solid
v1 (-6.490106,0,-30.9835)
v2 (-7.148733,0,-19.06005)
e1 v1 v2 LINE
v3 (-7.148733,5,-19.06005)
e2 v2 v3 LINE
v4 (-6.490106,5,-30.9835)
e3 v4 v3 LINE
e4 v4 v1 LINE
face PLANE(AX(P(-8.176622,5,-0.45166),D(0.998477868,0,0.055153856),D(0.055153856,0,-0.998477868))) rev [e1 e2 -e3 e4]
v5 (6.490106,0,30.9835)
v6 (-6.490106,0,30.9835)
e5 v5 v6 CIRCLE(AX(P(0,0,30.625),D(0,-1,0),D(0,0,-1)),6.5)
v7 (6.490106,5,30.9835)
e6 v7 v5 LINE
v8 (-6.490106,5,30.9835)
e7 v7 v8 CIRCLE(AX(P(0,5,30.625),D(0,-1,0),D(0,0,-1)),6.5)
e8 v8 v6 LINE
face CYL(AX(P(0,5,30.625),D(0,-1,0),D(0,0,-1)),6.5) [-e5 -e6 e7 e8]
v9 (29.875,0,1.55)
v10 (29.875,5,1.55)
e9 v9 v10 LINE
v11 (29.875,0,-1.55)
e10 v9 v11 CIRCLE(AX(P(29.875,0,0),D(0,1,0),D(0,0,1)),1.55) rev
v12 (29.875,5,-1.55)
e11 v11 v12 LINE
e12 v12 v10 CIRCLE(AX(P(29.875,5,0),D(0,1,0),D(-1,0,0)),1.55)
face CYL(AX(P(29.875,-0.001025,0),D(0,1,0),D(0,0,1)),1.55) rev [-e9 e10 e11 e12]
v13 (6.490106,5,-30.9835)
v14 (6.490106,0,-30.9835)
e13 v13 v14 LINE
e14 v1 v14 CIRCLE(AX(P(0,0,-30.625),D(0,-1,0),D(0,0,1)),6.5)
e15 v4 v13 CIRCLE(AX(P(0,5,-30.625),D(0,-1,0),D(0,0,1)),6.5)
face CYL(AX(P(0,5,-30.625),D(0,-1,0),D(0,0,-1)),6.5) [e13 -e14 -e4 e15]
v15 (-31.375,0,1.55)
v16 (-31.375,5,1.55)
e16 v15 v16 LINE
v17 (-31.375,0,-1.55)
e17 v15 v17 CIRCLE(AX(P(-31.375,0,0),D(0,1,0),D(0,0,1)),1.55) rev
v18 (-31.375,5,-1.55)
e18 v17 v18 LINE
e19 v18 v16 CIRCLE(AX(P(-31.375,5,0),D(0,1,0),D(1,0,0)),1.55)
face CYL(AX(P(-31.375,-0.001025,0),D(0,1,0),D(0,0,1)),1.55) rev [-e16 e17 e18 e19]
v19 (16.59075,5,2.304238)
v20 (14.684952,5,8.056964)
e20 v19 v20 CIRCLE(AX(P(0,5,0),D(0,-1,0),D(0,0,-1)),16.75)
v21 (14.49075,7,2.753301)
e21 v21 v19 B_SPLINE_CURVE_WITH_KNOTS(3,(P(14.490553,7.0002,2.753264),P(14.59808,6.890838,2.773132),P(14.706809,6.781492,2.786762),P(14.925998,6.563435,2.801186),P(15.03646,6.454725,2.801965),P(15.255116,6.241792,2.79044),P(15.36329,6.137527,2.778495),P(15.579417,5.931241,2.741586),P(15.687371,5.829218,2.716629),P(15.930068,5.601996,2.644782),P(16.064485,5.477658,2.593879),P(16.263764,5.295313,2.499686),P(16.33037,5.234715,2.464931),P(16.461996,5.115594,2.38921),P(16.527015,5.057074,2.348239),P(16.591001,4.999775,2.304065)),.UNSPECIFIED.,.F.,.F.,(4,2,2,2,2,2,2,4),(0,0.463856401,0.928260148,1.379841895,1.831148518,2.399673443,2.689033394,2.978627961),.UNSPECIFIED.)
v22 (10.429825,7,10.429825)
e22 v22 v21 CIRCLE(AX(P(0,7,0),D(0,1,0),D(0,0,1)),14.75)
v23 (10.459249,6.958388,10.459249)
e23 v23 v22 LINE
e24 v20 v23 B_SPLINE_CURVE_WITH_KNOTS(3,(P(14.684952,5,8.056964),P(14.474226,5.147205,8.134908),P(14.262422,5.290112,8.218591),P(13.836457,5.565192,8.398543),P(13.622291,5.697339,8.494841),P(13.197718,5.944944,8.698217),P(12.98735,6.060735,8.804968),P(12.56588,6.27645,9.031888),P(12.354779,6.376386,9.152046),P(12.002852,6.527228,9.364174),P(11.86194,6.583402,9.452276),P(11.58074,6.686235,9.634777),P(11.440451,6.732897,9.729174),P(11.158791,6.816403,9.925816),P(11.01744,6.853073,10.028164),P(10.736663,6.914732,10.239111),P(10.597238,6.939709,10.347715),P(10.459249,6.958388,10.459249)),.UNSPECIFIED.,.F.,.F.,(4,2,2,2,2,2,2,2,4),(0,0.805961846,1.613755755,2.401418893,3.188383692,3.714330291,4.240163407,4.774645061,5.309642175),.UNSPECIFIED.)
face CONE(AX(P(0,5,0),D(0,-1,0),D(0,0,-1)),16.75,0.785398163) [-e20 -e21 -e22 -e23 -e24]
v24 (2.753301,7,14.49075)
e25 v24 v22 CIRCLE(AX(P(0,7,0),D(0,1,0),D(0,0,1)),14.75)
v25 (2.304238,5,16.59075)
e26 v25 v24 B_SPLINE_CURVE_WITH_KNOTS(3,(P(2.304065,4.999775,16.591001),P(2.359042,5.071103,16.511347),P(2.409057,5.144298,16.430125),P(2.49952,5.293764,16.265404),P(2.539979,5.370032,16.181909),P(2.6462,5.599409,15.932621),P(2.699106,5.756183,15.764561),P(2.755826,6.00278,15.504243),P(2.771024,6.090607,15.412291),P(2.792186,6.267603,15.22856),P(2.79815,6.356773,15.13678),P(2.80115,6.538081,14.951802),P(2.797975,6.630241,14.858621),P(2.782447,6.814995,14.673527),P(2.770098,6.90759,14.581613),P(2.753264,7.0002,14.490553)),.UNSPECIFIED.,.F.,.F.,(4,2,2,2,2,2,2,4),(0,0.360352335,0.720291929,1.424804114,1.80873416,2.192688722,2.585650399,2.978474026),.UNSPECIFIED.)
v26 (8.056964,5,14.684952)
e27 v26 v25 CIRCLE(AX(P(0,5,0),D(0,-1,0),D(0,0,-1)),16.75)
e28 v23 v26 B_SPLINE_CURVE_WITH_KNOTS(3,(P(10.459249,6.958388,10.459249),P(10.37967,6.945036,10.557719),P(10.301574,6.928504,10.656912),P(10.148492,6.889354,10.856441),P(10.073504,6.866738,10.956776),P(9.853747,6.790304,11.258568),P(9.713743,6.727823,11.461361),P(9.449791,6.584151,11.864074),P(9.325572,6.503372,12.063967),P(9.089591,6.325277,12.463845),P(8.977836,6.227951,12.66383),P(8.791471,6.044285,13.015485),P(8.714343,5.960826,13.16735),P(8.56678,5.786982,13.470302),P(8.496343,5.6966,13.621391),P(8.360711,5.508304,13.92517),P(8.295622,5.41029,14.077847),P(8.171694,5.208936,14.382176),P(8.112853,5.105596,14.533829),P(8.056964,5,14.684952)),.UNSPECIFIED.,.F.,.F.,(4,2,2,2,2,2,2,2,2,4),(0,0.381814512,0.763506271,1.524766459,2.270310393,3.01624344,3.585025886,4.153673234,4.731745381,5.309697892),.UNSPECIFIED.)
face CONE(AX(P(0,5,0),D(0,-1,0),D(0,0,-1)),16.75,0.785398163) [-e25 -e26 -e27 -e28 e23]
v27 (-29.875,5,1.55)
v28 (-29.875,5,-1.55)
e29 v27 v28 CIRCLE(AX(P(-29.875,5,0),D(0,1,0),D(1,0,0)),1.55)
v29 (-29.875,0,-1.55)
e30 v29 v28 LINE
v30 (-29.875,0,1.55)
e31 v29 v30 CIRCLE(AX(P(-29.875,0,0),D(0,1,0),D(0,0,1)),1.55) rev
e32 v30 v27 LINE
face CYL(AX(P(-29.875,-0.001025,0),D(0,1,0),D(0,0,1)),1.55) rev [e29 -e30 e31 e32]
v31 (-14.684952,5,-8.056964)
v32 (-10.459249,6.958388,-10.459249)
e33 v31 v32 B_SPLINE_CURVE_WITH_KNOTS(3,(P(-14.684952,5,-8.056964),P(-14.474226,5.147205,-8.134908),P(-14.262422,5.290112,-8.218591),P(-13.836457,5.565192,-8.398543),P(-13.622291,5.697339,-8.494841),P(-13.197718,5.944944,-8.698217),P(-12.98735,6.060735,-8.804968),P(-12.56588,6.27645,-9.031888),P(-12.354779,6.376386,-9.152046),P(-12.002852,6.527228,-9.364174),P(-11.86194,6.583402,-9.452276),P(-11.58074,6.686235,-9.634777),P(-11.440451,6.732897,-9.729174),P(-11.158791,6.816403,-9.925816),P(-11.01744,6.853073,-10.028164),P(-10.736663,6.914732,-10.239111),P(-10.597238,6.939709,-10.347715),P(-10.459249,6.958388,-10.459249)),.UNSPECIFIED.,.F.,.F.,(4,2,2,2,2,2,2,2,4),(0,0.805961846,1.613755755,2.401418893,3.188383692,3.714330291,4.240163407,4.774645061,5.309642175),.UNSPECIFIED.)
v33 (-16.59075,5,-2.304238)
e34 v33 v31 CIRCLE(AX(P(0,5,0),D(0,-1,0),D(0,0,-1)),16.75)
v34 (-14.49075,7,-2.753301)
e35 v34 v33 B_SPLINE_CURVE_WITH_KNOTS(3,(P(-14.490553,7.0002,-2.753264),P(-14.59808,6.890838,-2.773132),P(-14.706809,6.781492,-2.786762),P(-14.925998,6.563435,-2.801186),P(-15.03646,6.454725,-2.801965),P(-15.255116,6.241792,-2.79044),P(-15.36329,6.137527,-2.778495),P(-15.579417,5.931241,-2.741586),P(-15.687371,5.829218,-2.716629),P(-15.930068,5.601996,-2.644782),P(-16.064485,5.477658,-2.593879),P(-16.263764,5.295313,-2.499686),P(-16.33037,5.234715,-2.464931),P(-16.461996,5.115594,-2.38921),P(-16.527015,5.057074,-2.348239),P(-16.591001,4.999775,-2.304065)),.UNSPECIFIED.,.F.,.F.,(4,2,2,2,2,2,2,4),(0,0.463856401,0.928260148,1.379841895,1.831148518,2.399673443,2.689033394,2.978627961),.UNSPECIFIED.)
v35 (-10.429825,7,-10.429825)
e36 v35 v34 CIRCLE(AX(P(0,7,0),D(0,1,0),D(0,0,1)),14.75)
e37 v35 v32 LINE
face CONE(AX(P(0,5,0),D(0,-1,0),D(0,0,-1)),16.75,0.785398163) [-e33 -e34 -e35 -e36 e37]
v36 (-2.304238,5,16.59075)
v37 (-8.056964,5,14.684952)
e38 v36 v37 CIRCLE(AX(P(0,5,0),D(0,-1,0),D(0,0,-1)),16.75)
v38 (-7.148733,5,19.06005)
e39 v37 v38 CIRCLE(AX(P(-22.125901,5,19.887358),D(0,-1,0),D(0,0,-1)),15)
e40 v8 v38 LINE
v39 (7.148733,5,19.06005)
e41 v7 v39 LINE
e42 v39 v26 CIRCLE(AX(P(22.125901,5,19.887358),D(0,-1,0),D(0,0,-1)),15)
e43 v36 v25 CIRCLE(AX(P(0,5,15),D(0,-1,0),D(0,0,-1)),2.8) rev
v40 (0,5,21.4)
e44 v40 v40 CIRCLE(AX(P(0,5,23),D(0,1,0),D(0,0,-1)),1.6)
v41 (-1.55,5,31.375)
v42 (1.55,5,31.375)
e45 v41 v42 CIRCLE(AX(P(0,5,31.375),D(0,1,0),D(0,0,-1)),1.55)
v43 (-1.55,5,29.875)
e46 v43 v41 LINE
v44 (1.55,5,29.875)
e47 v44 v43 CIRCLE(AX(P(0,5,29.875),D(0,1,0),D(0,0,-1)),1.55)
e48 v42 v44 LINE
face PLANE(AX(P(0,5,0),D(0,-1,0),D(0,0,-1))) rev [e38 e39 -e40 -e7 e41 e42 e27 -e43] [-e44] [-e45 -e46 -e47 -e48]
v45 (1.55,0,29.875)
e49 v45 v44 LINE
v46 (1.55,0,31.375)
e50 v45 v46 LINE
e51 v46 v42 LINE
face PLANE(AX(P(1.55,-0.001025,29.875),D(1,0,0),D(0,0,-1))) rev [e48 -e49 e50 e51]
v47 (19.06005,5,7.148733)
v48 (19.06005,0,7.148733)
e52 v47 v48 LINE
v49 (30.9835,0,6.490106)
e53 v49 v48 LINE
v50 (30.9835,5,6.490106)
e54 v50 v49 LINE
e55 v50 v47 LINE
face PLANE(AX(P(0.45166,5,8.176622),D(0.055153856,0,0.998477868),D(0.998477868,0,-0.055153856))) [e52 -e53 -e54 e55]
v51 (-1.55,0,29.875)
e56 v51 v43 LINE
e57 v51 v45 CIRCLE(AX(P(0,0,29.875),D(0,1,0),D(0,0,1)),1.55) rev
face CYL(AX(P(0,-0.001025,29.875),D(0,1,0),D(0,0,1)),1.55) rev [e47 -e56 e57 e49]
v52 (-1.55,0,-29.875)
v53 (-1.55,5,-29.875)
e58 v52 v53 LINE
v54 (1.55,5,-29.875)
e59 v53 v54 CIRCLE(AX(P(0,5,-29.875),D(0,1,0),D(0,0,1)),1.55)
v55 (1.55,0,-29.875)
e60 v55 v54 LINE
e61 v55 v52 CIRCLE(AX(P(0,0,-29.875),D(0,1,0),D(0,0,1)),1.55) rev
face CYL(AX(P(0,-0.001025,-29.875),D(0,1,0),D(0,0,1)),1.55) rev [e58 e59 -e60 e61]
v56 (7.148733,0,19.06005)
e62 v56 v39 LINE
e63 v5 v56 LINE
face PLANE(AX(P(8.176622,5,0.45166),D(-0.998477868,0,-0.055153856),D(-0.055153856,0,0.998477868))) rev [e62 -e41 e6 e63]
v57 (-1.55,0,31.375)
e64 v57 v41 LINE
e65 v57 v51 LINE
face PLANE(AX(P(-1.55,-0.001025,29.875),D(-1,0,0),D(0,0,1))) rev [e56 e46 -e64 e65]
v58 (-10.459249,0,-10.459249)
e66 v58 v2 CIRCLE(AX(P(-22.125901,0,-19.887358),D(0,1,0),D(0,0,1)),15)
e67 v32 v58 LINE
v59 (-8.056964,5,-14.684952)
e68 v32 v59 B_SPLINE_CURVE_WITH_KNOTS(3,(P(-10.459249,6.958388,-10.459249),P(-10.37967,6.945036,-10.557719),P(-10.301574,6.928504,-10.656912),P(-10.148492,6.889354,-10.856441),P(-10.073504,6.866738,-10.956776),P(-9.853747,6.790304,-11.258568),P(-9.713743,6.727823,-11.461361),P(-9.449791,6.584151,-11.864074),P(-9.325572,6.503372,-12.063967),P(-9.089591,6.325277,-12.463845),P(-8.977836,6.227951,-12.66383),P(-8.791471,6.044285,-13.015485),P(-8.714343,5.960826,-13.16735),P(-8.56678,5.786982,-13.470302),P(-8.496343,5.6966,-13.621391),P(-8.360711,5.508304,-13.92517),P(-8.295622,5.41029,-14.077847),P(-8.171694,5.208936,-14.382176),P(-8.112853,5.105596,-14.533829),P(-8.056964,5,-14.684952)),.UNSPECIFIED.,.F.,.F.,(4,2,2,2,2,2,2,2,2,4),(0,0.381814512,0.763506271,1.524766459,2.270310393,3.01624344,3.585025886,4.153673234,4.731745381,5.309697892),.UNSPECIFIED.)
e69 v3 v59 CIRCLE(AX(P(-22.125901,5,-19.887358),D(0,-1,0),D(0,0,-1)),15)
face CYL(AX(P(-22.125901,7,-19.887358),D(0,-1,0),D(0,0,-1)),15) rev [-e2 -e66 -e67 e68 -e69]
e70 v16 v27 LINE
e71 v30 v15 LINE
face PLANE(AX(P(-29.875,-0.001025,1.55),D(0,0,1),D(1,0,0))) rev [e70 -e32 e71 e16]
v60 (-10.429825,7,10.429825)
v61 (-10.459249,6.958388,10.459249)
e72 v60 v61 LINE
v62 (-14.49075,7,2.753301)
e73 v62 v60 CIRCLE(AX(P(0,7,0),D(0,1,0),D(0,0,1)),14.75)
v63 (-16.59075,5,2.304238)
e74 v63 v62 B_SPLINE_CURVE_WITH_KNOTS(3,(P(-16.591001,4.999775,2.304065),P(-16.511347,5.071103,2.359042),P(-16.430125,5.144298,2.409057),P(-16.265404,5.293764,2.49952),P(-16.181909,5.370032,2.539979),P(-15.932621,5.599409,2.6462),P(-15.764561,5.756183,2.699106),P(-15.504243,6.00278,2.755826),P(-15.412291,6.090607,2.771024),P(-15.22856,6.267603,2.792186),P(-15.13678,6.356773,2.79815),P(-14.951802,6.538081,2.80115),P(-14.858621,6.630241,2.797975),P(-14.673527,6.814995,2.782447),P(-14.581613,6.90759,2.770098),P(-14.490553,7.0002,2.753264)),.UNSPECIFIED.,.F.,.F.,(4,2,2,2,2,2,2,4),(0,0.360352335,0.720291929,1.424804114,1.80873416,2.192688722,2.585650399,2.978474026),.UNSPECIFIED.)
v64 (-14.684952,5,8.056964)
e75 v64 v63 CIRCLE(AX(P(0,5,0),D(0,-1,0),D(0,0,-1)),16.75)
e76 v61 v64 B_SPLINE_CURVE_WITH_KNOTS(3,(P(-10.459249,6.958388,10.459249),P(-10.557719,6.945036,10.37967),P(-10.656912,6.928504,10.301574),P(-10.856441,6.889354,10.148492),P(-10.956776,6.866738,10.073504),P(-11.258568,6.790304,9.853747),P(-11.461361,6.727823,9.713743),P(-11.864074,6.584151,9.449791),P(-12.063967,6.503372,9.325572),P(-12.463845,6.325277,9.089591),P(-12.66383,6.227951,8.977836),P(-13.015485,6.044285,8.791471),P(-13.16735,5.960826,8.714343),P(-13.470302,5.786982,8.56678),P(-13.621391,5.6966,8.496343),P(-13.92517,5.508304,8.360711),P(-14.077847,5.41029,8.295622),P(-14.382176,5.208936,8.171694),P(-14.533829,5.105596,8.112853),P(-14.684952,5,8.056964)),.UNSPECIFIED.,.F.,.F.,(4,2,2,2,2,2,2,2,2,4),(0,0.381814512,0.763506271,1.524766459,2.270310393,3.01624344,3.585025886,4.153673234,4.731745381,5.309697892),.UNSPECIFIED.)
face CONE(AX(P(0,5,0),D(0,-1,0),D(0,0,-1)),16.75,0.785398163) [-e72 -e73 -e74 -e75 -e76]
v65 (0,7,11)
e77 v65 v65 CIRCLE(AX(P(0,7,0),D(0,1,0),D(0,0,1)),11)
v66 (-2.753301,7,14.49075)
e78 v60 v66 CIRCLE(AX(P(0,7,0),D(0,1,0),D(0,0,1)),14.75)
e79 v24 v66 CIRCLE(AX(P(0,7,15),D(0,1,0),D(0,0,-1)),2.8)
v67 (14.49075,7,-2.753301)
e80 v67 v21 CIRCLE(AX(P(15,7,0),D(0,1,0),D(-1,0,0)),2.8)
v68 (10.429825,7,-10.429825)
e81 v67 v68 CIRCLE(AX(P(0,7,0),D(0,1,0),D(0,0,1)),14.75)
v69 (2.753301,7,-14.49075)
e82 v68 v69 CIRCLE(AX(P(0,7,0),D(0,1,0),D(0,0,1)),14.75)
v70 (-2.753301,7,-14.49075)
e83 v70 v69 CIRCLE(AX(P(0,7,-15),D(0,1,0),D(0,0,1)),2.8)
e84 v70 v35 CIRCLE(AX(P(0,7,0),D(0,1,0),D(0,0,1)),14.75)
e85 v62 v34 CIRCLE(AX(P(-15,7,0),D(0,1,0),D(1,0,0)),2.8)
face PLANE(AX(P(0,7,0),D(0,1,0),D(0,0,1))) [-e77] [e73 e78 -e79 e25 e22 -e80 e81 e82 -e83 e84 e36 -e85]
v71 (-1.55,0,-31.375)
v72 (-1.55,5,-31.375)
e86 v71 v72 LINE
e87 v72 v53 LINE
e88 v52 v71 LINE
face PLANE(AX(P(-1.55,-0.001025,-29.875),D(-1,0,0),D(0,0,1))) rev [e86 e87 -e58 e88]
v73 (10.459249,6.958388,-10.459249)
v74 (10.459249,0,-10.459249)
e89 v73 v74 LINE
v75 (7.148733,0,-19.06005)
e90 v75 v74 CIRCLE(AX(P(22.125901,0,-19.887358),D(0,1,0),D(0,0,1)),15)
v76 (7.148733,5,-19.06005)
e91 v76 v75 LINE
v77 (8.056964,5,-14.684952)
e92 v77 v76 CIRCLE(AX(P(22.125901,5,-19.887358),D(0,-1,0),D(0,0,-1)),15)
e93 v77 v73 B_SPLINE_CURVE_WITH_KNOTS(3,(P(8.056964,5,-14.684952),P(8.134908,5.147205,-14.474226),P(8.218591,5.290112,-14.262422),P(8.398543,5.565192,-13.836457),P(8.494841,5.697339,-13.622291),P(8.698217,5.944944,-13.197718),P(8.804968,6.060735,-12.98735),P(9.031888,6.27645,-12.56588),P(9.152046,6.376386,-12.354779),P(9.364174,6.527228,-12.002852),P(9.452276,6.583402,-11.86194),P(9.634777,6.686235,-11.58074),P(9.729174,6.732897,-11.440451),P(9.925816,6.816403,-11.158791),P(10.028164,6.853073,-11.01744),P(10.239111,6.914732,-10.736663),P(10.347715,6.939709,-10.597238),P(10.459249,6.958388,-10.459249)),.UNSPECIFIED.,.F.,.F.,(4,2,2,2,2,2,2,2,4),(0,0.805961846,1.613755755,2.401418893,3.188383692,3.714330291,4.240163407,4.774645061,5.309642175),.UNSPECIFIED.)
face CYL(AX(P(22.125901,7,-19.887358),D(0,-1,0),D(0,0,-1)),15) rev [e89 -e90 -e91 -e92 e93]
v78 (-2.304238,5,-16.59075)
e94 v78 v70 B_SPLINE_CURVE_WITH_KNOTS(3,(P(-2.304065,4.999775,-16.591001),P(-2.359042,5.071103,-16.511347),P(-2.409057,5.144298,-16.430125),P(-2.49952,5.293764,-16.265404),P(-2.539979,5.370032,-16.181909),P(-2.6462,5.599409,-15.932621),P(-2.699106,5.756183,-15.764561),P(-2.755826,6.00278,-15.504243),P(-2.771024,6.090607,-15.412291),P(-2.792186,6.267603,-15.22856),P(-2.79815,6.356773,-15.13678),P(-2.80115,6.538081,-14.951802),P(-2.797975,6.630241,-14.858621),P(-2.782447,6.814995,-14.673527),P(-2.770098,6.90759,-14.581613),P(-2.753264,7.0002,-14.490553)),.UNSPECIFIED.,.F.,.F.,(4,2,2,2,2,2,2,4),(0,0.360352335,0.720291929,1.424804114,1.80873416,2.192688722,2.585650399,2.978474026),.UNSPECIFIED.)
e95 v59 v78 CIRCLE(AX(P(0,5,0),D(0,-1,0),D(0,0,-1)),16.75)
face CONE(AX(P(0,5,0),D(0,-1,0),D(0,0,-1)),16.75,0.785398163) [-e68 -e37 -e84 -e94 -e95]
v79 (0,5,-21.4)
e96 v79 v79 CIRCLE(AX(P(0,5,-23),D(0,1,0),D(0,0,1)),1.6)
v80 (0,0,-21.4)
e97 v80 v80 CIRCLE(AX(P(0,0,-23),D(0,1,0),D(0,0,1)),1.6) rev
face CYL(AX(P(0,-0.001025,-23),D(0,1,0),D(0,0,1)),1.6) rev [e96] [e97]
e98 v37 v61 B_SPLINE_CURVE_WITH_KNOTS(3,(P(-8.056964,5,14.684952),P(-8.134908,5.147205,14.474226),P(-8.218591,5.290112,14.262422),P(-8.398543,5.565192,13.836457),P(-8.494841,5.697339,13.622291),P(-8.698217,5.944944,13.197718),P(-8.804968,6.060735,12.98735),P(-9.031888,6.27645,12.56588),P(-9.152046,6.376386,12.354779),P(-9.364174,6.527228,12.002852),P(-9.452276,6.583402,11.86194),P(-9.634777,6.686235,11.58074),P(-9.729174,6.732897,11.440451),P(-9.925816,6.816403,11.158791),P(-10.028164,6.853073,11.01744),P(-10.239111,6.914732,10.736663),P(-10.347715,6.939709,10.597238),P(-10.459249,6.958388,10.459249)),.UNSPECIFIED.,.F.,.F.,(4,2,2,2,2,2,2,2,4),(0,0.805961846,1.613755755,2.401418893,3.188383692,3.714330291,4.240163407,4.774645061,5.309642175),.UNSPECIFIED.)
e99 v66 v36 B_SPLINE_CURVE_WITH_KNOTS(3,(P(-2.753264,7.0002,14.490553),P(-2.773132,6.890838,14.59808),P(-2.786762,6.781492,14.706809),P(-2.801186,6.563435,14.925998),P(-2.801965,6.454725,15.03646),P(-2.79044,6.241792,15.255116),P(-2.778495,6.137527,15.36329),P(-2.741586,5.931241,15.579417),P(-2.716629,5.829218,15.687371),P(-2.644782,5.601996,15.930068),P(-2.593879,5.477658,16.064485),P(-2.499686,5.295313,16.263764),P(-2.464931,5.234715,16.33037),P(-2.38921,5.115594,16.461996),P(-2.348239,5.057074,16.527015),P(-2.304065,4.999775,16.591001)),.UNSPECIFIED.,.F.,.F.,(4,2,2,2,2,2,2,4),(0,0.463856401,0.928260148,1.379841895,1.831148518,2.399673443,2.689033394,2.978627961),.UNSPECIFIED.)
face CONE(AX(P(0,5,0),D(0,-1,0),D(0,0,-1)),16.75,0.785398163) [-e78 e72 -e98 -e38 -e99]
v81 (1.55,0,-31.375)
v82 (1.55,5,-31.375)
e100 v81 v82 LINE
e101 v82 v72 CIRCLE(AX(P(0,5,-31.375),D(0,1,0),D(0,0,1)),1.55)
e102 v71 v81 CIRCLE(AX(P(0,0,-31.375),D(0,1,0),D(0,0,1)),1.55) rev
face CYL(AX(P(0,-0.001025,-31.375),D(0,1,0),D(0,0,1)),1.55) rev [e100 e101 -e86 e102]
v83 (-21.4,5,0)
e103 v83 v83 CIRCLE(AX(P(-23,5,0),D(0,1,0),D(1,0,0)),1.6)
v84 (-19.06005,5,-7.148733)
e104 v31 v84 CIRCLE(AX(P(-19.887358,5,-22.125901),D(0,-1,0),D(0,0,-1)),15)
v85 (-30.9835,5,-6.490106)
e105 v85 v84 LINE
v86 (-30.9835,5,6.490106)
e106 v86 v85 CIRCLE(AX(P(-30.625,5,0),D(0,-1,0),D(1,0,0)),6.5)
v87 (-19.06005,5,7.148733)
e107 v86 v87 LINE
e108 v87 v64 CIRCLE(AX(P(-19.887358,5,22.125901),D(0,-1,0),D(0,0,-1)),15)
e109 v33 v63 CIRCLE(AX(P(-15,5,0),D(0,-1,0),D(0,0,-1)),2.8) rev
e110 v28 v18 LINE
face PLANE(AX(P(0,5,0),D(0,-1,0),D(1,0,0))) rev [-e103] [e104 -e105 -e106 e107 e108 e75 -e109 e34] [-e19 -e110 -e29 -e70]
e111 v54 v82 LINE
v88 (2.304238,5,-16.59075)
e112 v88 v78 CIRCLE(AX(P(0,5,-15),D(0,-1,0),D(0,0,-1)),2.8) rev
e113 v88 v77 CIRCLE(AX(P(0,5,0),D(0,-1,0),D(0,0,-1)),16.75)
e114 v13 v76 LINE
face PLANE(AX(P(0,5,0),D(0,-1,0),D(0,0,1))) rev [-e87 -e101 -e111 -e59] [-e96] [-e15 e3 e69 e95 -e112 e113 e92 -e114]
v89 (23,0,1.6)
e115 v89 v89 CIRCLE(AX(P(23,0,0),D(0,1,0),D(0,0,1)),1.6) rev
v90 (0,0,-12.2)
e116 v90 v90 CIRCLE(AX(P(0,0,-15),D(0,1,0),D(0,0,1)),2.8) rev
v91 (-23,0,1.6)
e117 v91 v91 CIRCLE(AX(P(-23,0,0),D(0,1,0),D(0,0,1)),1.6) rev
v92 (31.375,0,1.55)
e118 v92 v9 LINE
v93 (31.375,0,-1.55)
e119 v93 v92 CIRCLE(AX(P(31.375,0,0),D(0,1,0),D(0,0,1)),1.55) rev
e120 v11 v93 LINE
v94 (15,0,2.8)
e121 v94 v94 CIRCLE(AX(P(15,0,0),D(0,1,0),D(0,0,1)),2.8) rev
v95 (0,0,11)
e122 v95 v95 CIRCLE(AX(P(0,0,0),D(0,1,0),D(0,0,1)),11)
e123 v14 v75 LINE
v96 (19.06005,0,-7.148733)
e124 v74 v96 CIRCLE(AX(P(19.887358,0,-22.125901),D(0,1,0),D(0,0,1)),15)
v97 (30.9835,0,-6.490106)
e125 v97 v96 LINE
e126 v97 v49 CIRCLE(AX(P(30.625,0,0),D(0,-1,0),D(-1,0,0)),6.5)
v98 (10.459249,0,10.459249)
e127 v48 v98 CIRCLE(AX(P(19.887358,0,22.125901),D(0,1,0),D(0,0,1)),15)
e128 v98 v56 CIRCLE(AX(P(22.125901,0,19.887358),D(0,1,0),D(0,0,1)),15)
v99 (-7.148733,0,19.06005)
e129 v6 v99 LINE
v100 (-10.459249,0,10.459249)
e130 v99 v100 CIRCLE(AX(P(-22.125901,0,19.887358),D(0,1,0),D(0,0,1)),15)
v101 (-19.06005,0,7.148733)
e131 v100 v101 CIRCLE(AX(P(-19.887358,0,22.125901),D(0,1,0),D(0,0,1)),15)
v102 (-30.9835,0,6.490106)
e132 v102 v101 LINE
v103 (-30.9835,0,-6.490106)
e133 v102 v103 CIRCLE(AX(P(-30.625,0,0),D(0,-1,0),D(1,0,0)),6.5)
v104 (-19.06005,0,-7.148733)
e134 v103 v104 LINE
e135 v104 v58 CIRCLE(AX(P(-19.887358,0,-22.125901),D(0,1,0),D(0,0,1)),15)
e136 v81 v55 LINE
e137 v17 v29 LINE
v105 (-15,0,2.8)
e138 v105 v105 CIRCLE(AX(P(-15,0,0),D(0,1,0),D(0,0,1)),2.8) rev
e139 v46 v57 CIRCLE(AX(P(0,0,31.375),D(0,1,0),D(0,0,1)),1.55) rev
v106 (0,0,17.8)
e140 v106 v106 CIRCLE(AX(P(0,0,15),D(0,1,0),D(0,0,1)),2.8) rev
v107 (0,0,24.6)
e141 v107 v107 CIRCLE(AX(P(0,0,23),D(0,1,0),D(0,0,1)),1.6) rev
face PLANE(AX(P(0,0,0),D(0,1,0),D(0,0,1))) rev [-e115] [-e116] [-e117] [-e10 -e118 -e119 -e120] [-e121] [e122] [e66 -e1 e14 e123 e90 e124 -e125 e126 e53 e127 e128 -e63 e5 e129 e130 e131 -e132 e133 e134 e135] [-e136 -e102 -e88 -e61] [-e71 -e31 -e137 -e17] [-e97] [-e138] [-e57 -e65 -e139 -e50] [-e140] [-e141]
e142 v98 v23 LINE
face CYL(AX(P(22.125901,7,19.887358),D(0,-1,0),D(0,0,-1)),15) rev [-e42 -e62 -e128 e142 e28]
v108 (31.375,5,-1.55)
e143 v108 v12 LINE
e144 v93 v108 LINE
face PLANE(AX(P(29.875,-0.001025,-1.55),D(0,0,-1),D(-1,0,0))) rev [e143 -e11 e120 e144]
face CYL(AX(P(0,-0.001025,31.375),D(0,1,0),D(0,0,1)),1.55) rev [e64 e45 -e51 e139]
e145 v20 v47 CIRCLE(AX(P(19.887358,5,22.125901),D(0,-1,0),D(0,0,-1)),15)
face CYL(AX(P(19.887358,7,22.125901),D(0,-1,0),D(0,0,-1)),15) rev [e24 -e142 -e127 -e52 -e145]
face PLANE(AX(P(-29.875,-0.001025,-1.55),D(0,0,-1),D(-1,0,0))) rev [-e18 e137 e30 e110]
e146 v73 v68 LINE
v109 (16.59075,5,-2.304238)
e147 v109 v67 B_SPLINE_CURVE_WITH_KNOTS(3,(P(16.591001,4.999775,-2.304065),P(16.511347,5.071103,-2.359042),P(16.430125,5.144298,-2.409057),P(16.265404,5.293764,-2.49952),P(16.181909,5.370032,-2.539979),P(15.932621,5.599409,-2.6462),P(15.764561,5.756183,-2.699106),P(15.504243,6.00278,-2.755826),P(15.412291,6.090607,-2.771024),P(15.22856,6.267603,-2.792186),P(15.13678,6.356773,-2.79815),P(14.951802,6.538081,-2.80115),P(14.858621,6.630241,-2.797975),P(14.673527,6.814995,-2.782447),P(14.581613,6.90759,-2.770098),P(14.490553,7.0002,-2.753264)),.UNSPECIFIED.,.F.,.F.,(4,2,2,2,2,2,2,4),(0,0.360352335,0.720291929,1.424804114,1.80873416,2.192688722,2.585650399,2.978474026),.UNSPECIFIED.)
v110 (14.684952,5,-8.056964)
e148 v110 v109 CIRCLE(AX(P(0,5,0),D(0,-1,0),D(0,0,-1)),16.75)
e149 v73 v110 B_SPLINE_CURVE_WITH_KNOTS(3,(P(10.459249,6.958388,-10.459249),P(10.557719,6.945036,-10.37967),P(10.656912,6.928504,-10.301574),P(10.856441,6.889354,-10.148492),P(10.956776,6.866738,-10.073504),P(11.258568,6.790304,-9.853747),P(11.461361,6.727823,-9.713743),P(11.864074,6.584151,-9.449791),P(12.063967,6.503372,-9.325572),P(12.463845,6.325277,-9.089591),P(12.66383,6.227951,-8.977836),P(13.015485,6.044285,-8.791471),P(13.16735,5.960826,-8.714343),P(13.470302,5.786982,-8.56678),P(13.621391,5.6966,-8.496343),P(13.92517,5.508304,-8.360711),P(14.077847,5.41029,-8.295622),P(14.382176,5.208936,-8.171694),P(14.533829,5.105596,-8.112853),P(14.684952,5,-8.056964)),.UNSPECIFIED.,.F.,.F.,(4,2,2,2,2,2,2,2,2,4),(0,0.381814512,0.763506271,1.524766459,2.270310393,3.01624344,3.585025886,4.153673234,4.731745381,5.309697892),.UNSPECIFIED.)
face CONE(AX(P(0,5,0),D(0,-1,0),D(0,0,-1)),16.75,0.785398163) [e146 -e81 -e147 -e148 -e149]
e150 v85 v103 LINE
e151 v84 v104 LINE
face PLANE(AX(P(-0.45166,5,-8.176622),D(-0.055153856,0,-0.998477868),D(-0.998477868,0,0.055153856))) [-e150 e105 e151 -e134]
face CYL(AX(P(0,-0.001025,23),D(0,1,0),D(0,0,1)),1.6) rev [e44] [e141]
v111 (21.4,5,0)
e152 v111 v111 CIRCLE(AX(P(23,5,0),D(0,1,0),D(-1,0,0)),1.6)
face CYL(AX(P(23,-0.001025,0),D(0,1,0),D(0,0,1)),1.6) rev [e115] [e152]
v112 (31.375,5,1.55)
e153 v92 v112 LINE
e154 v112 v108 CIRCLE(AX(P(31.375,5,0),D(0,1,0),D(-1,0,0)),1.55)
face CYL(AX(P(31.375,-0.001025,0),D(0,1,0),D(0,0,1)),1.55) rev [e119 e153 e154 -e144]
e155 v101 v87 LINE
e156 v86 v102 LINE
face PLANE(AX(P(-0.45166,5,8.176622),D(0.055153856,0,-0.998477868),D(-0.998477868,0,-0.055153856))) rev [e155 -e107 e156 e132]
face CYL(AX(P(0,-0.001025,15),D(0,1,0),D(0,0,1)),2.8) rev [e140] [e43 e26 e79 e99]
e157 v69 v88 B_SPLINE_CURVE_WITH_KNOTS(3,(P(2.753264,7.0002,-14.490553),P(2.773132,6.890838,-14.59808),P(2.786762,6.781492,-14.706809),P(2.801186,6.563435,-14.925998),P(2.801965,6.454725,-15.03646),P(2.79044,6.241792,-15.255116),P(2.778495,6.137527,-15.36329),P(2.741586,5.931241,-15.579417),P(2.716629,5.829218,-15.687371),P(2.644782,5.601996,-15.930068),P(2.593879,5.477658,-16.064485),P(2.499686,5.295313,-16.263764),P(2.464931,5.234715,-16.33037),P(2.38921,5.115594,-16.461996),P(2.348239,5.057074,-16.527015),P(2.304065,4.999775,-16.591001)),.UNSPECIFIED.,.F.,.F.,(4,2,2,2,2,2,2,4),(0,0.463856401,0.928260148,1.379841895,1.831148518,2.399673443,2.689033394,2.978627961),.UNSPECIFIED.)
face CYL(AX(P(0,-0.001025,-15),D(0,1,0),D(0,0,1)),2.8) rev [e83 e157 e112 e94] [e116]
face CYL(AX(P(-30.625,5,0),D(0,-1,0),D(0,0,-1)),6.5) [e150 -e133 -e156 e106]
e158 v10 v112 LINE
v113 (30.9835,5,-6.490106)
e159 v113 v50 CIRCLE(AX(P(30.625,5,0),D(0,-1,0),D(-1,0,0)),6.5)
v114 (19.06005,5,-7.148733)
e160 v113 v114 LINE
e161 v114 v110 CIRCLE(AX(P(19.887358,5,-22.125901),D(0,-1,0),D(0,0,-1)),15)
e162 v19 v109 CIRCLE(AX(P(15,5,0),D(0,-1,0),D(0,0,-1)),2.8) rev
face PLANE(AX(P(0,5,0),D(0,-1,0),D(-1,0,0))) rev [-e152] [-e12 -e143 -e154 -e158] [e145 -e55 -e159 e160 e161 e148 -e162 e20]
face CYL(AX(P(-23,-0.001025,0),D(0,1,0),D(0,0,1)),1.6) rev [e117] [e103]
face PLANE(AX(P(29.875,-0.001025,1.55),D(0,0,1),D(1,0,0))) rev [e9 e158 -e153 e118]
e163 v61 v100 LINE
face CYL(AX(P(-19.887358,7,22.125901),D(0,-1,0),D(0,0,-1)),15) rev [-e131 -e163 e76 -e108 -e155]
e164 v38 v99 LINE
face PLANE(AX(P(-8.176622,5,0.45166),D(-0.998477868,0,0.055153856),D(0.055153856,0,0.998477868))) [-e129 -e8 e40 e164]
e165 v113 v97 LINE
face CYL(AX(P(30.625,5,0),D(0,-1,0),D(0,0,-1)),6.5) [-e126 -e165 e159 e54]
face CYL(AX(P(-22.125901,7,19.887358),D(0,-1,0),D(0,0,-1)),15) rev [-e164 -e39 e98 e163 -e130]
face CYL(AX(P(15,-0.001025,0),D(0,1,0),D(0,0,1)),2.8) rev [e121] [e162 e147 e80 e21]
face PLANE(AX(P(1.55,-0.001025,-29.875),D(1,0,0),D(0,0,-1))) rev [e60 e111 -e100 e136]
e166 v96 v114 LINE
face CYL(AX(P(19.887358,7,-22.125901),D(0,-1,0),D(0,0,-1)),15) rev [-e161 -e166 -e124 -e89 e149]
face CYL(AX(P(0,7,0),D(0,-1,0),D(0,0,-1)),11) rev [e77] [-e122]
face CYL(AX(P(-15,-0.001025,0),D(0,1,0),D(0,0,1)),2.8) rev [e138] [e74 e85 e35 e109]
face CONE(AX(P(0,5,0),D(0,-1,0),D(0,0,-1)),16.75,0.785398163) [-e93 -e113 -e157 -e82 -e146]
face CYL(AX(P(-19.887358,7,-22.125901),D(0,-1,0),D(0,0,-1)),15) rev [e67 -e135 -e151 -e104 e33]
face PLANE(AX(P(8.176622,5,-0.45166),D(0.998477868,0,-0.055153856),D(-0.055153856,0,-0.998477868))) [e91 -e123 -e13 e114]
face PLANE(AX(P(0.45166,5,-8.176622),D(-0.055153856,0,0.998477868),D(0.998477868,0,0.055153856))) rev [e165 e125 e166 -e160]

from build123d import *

# Parameters (mm, degrees)
SKETCH1_R           = 14.75
SKETCH1_R_2         = 11
BOSS_EXTRUDE1_DEPTH = 7
SKETCH5_R           = 6.5
BOSS_EXTRUDE3_DEPTH = 5
FILLET2_R           = 15
CIRPATTERN2_DEPTH   = 5
CHAMFER2_SIZE       = 2
CUT_EXTRUDE3_REACH  = 54.74
CIRPATTERN4_COUNT   = 4
CUT_EXTRUDE4_REACH  = 54.967
SKETCH9_R           = 2.8
CIRPATTERN5_COUNT   = 4
CUT_EXTRUDE5_REACH  = 54.74
SKETCH10_R          = 1.6
CIRPATTERN6_COUNT   = 4


# Read off the part's stored shape, not the designer's step: CirPattern2
with BuildPart() as part:
    # Sketch1 → Boss-Extrude1 (new body)
    with BuildSketch(Plane(origin=(0, 0, 0), x_dir=(1, 0, 0), z_dir=(0, 1, 0))):
        with Locations(Location((0, 0, 0), (0, 0, 270))):
            Circle(SKETCH1_R)
        with Locations(Location((0, 0, 0), (0, 0, 270))):
            Circle(SKETCH1_R_2, mode=Mode.SUBTRACT)
    extrude(amount=BOSS_EXTRUDE1_DEPTH)

    # Sketch5 → Boss-Extrude3 (add)
    with BuildSketch(Plane.XZ):
        with BuildLine():
            ThreePointArc((6.5, 30.625), (-0.17931828, 24.127473936), (-6.49010614, 30.983500062))
            Line((-6.49010614, 30.983500062), (-7.5, 12.700885796))
            ThreePointArc((-7.5, 12.700885796), (0, 14.75), (7.5, 12.700885796))
            Line((7.5, 12.700885796), (6.49010614, 30.983500062))
            ThreePointArc((6.49010614, 30.983500062), (6.497526064, 30.80431828), (6.5, 30.625))
        make_face()
        with Locations((0, 30.625)):
            Circle(SKETCH5_R)
    extrude(amount=-BOSS_EXTRUDE3_DEPTH)

    # Fillet2
    fillet2_edges = [part.edges().sort_by_distance(p)[0] for p in [
        (7.5, 2.5, 12.700885796),
        (-7.5, 2.5, 12.700885796),
    ]]
    fillet(fillet2_edges, radius=FILLET2_R)

    # CirPattern2 outline → CirPattern2 (add)
    with BuildSketch(Plane(origin=(0, 0, 0), x_dir=(1, 0, 0), z_dir=(0, 1, 0))):
        with BuildLine():
            Line((-30.983500062, -6.49010614), (-19.060050189, -7.14873289))
            ThreePointArc((-19.060050189, -7.14873289), (-14.499104834, -8.127089257), (-10.459249152, -10.459249152))
            ThreePointArc((-10.459249152, -10.459249152), (-10.710685451, -10.156332582), (-10.969984482, -9.860118684))
            ThreePointArc((-10.969984482, -9.860118684), (0, 14.75), (10.969984482, -9.860118684))
            ThreePointArc((10.969984482, -9.860118684), (10.710685451, -10.156332582), (10.459249152, -10.459249152))
            ThreePointArc((10.459249152, -10.459249152), (14.499104834, -8.127089257), (19.060050189, -7.14873289))
            Line((19.060050189, -7.14873289), (30.983500062, -6.49010614))
            ThreePointArc((30.983500062, -6.49010614), (37.125, 0), (30.983500062, 6.49010614))
            Line((30.983500062, 6.49010614), (19.060050189, 7.14873289))
            ThreePointArc((19.060050189, 7.14873289), (14.499104834, 8.127089257), (10.459249152, 10.459249152))
            ThreePointArc((10.459249152, 10.459249152), (8.127089257, 14.499104834), (7.14873289, 19.060050189))
            Line((7.14873289, 19.060050189), (6.49010614, 30.983500062))
            ThreePointArc((6.49010614, 30.983500062), (0, 37.125), (-6.49010614, 30.983500062))
            Line((-6.49010614, 30.983500062), (-7.14873289, 19.060050189))
            ThreePointArc((-7.14873289, 19.060050189), (-8.127089257, 14.499104834), (-10.459249152, 10.459249152))
            ThreePointArc((-10.459249152, 10.459249152), (-14.499104834, 8.127089257), (-19.060050189, 7.14873289))
            Line((-19.060050189, 7.14873289), (-30.983500062, 6.49010614))
            ThreePointArc((-30.983500062, 6.49010614), (-37.125, 0), (-30.983500062, -6.49010614))
        make_face()
    extrude(amount=CIRPATTERN2_DEPTH)

    # Chamfer2
    # the kernel refuses this chamfer: 2 mm, written as the material it adds along each edge
    with BuildSketch(Plane(origin=(0, 5, 0), x_dir=(-0.7437277614936905, 0, 0.6684826226489246), z_dir=(0.6684826226489246, 0, 0.7437277614936905))) as chamfer2_piece_1_section:
        Polygon((14.75, -CHAMFER2_SIZE), (14.75 + CHAMFER2_SIZE, 0), (14.75, 0), align=None)
    chamfer2_piece_1 = revolve(axis=Axis((0, 5, 0), (0, -1, 0)), revolution_arc=263.900121289, mode=Mode.PRIVATE)
    chamfer2_piece_1 = chamfer2_piece_1 - Plane(origin=(-19.887358028, 5.976556714, 22.125900918), x_dir=(0.055153855863411774, 0, -0.998477867648251), z_dir=(0, -1, 0)) * Cylinder(15.000000014, 67, mode=Mode.PRIVATE)
    chamfer2_piece_1 = chamfer2_piece_1 - Plane(origin=(19.887358028, 5.976556714, 22.125900918), x_dir=(-0.62854059114179, 0, -0.7777767837156939), z_dir=(0, -1, 0)) * Cylinder(15.000000014, 67, mode=Mode.PRIVATE)
    chamfer2_piece_1 = chamfer2_piece_1 - Plane(origin=(22.125900918, 5.976556714, -19.887358028), x_dir=(-0.7777767837156939, 0, 0.62854059114179), z_dir=(0, -1, 0)) * Cylinder(15.000000014, 67, mode=Mode.PRIVATE)
    chamfer2_piece_1 = chamfer2_piece_1 - Plane(origin=(-19.887358028, 5.976556714, -22.125900918), x_dir=(0.62854059114179, 0, 0.7777767837156939), z_dir=(0, -1, 0)) * Cylinder(15.000000014, 67, mode=Mode.PRIVATE)
    add(chamfer2_piece_1)
    with BuildSketch(Plane(origin=(0, 5, 0), x_dir=(-0.7437277614936905, 0, 0.6684826226489246), z_dir=(0.6684826226489246, 0, 0.7437277614936905))) as chamfer2_piece_2_section:
        Polygon((14.75, -CHAMFER2_SIZE), (14.75 + CHAMFER2_SIZE, 0), (14.75, 0), align=None)
    chamfer2_piece_2 = revolve(axis=Axis((0, 5, 0), (0, -1, 0)), revolution_arc=263.900121289, mode=Mode.PRIVATE)
    chamfer2_piece_2 = chamfer2_piece_2 - Plane(origin=(-19.887358028, 5.654995073, 22.125900918), x_dir=(0.055153855863411774, 0, -0.998477867648251), z_dir=(0, -1, 0)) * Cylinder(15.000000014, 67, mode=Mode.PRIVATE)
    chamfer2_piece_2 = chamfer2_piece_2 - Plane(origin=(19.887358028, 5.654995073, 22.125900918), x_dir=(-0.62854059114179, 0, -0.7777767837156939), z_dir=(0, -1, 0)) * Cylinder(15.000000014, 67, mode=Mode.PRIVATE)
    chamfer2_piece_2 = chamfer2_piece_2 - Plane(origin=(19.887358028, 5.654995073, -22.125900918), x_dir=(-0.055153855863411774, 0, 0.998477867648251), z_dir=(0, -1, 0)) * Cylinder(15.000000014, 67, mode=Mode.PRIVATE)
    chamfer2_piece_2 = chamfer2_piece_2 - Plane(origin=(-22.125900918, 5.654995073, -19.887358028), x_dir=(0.998477867648251, 0, 0.055153855863411774), z_dir=(0, -1, 0)) * Cylinder(15.000000014, 67, mode=Mode.PRIVATE)
    add(chamfer2_piece_2)
    with BuildSketch(Plane(origin=(0, 5, 0), x_dir=(0, 0, 1), z_dir=(-1, 0, 0))) as chamfer2_piece_3_section:
        Polygon((14.75, CHAMFER2_SIZE), (14.75 + CHAMFER2_SIZE, 0), (14.75, 0), align=None)
    chamfer2_piece_3 = revolve(axis=Axis((0, 5, 0), (0, 1, 0)), revolution_arc=48.049939357, mode=Mode.PRIVATE)
    chamfer2_piece_3 = chamfer2_piece_3 - Plane(origin=(22.125900905, 5.691339401, 19.887358023), x_dir=(-0.7437277615096491, 0, -0.6684826226311694), z_dir=(0, 1, 0)) * Cylinder(15, 68, mode=Mode.PRIVATE)
    add(chamfer2_piece_3)
    with BuildSketch(Plane(origin=(0, 5, 0), x_dir=(0, 0, 1), z_dir=(-1, 0, 0))) as chamfer2_piece_4_section:
        Polygon((14.75, CHAMFER2_SIZE), (14.75 + CHAMFER2_SIZE, 0), (14.75, 0), align=None)
    chamfer2_piece_4 = revolve(axis=Axis((0, 5, 0), (0, 1, 0)), revolution_arc=48.049939357, mode=Mode.PRIVATE)
    chamfer2_piece_4 = chamfer2_piece_4 - Plane(origin=(19.887358028, 5.96883772, 22.125900918), x_dir=(-0.62854059114179, 0, -0.7777767837156939), z_dir=(0, -1, 0)) * Cylinder(15.000000014, 68, mode=Mode.PRIVATE)
    add(chamfer2_piece_4)
    with BuildSketch(Plane(origin=(0, 5, 0), x_dir=(-0.743727761509649, 0, 0.6684826226311695), z_dir=(-0.6684826226311695, 0, -0.743727761509649))) as chamfer2_piece_5_section:
        Polygon((14.75, CHAMFER2_SIZE), (14.75 + CHAMFER2_SIZE, 0), (14.75, 0), align=None)
    chamfer2_piece_5 = revolve(axis=Axis((0, 5, 0), (0, 1, 0)), revolution_arc=48.049939357, mode=Mode.PRIVATE)
    chamfer2_piece_5 = chamfer2_piece_5 - Plane(origin=(-22.125900905, 5.99378233, 19.887358023), x_dir=(0.7437277615096493, 0, -0.6684826226311694), z_dir=(0, 1, 0)) * Cylinder(15, 67, mode=Mode.PRIVATE)
    add(chamfer2_piece_5)
    with BuildSketch(Plane(origin=(0, 5, 0), x_dir=(-0.743727761509649, 0, 0.6684826226311695), z_dir=(-0.6684826226311695, 0, -0.743727761509649))) as chamfer2_piece_6_section:
        Polygon((14.75, CHAMFER2_SIZE), (14.75 + CHAMFER2_SIZE, 0), (14.75, 0), align=None)
    chamfer2_piece_6 = revolve(axis=Axis((0, 5, 0), (0, 1, 0)), revolution_arc=48.049939357, mode=Mode.PRIVATE)
    chamfer2_piece_6 = chamfer2_piece_6 - Plane(origin=(-19.887358028, 5.968837515, 22.125900918), x_dir=(0.055153855863411774, 0, -0.998477867648251), z_dir=(0, -1, 0)) * Cylinder(15.000000014, 67, mode=Mode.PRIVATE)
    add(chamfer2_piece_6)

    # Sketch8 → Cut-Extrude3 (cut, up to next)
    with BuildSketch(Plane(origin=(0, 5, 0), x_dir=(1, 0, 0), z_dir=(0, 1, 0)), mode=Mode.PRIVATE) as cut_extrude3_sk1:
        with BuildLine():
            Line((-1.55, 29.875), (-1.55, 31.375))
            ThreePointArc((-1.55, 31.375), (0, 32.925), (1.55, 31.375))
            Line((1.55, 31.375), (1.55, 29.875))
            ThreePointArc((1.55, 29.875), (0, 28.325), (-1.55, 29.875))
        make_face()
    cut_extrude3_tool1 = extrude(cut_extrude3_sk1.sketch, amount=-CUT_EXTRUDE3_REACH, mode=Mode.PRIVATE) & part.part
    cut_extrude3 = cut_extrude3_tool1.solids().sort_by_distance((0, 5, -30.625))[0]
    add(cut_extrude3, mode=Mode.SUBTRACT)

    # CirPattern4: Cut-Extrude3 ×4 about axis
    cirpattern4_axis = Axis((0, 0, 0), (0, 1, 0))
    for i in range(1, CIRPATTERN4_COUNT):
        add(cut_extrude3.rotate(cirpattern4_axis, i * 360 / CIRPATTERN4_COUNT), mode=Mode.SUBTRACT)

    # Sketch9 → Cut-Extrude4 (cut, up to next)
    with BuildSketch(Plane(origin=(0, 7, 0), x_dir=(1, 0, 0), z_dir=(0, 1, 0)), mode=Mode.PRIVATE) as cut_extrude4_sk1:
        with Locations(Location((0, 15, 0), (0, 0, 270))):
            Circle(SKETCH9_R)
    cut_extrude4_tool1 = extrude(cut_extrude4_sk1.sketch, amount=-CUT_EXTRUDE4_REACH, mode=Mode.PRIVATE) & part.part
    cut_extrude4 = cut_extrude4_tool1.solids().sort_by_distance((0, 7, -15))[0]
    add(cut_extrude4, mode=Mode.SUBTRACT)

    # CirPattern5: Cut-Extrude4 ×4 about axis
    cirpattern5_axis = Axis((0, 0, 0), (0, 1, 0))
    for i in range(1, CIRPATTERN5_COUNT):
        add(cut_extrude4.rotate(cirpattern5_axis, i * 360 / CIRPATTERN5_COUNT), mode=Mode.SUBTRACT)

    # Sketch10 → Cut-Extrude5 (cut, up to next)
    with BuildSketch(Plane(origin=(0, 5, 0), x_dir=(1, 0, 0), z_dir=(0, 1, 0)), mode=Mode.PRIVATE) as cut_extrude5_sk1:
        with Locations(Location((0, 23, 0), (0, 0, 270))):
            Circle(SKETCH10_R)
    cut_extrude5_tool1 = extrude(cut_extrude5_sk1.sketch, amount=-CUT_EXTRUDE5_REACH, mode=Mode.PRIVATE) & part.part
    cut_extrude5 = cut_extrude5_tool1.solids().sort_by_distance((0, 5, -23))[0]
    add(cut_extrude5, mode=Mode.SUBTRACT)

    # CirPattern6: Cut-Extrude5 ×4 about axis
    cirpattern6_axis = Axis((0, 0, 0), (0, 1, 0))
    for i in range(1, CIRPATTERN6_COUNT):
        add(cut_extrude5.rotate(cirpattern6_axis, i * 360 / CIRPATTERN6_COUNT), mode=Mode.SUBTRACT)


solid = part.part
